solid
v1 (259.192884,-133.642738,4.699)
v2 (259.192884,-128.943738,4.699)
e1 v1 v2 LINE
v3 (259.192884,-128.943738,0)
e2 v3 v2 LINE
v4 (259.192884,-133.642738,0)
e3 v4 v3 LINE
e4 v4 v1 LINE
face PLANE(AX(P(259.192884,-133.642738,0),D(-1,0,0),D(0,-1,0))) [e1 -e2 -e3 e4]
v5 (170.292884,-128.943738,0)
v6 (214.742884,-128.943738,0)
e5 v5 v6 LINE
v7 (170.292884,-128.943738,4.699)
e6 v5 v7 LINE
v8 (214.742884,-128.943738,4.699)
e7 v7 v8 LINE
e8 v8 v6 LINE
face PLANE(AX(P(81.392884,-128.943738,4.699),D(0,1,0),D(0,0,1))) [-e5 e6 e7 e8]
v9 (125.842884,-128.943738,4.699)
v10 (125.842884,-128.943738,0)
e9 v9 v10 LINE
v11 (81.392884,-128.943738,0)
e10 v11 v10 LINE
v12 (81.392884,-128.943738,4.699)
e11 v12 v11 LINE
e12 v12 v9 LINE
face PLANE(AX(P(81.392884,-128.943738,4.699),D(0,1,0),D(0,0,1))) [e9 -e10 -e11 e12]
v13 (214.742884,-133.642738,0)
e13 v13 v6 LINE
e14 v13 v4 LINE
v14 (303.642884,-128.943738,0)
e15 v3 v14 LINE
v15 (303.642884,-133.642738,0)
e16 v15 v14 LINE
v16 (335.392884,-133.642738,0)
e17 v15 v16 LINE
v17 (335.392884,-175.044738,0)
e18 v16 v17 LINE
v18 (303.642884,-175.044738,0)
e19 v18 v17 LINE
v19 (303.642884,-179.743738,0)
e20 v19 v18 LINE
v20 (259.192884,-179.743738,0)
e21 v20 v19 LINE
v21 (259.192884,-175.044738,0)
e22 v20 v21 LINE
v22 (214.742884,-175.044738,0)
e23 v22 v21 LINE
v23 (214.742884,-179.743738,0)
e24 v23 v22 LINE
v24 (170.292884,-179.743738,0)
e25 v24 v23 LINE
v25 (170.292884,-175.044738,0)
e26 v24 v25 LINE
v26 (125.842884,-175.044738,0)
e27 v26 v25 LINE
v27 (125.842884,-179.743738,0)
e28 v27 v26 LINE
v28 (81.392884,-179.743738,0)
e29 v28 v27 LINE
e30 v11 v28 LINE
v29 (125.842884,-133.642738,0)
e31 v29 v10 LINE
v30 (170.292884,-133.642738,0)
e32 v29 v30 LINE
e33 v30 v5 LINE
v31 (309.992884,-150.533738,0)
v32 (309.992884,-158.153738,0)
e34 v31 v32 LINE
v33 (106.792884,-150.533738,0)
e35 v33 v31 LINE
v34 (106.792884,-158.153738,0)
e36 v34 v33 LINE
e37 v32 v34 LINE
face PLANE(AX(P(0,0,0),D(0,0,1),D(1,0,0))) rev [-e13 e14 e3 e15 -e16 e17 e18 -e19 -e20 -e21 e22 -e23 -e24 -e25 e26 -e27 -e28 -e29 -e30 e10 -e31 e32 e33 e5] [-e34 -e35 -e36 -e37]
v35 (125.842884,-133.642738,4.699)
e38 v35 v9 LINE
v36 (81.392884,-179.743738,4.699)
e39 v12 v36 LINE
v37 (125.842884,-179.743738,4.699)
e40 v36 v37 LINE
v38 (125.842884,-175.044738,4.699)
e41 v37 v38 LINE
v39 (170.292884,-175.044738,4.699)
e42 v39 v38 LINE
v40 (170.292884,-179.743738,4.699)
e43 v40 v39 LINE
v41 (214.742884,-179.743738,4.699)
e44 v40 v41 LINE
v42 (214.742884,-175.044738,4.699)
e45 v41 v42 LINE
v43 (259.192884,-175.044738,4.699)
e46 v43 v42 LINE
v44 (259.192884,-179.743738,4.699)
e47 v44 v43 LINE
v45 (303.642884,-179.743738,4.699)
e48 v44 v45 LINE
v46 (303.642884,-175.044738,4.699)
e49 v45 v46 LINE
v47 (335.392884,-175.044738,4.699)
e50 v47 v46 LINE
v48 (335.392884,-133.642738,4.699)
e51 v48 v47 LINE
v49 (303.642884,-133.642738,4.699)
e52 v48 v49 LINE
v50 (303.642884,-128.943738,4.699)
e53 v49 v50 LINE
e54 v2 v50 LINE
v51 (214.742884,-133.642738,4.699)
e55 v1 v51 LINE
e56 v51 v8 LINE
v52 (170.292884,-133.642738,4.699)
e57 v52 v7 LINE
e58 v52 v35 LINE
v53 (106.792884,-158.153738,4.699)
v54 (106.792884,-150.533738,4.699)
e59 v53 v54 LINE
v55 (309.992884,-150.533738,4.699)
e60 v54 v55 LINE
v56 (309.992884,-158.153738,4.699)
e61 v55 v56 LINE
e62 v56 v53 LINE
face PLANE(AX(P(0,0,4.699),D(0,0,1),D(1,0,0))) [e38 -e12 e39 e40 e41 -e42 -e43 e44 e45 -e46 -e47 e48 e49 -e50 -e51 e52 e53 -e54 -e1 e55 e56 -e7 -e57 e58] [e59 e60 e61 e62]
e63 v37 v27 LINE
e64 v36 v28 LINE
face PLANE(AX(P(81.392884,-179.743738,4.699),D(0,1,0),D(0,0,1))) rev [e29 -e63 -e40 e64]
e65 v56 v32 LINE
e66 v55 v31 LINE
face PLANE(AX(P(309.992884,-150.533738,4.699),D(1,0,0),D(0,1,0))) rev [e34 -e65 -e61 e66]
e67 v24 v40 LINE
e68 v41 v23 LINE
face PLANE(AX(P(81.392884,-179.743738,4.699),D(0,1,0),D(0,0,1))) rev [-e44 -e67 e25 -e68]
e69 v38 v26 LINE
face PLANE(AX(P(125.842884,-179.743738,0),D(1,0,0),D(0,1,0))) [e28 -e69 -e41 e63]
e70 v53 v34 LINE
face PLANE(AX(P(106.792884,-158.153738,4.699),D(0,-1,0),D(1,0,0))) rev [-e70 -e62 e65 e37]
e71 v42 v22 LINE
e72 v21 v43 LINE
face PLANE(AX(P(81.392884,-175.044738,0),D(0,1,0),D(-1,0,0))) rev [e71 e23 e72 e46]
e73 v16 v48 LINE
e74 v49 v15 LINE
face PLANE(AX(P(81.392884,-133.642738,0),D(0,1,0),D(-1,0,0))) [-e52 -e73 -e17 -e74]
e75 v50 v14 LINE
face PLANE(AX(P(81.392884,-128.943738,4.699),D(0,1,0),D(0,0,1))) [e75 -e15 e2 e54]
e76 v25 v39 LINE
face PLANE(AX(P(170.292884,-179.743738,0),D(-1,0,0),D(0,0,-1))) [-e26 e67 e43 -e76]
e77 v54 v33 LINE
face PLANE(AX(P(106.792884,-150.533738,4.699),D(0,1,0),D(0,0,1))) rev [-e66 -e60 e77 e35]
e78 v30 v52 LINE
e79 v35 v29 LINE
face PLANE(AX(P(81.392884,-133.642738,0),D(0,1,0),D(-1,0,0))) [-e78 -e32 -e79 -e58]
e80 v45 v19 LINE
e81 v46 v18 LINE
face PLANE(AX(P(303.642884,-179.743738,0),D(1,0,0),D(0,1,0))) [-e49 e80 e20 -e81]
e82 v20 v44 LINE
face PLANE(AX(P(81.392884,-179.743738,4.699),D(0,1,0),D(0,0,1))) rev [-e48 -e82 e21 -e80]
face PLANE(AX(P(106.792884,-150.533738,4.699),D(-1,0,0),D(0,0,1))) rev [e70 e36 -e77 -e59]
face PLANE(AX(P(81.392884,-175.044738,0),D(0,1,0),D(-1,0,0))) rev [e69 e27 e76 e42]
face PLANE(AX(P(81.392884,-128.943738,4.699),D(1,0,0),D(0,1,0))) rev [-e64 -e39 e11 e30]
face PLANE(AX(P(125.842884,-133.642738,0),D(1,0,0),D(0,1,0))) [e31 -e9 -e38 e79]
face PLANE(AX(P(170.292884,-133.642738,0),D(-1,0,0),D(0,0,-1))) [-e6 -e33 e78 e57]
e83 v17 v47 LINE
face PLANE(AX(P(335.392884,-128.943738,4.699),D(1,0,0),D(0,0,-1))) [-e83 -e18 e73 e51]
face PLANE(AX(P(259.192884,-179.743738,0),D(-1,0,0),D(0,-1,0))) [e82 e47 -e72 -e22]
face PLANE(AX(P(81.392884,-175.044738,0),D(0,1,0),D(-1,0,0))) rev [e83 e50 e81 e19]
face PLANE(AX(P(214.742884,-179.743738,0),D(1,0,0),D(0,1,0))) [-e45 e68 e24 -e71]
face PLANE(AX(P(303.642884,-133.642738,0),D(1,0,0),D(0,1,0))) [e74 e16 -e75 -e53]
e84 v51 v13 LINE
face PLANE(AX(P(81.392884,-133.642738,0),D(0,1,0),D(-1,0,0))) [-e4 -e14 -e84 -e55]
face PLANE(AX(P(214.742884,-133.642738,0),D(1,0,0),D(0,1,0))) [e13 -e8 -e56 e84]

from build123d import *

# Parameters (mm, degrees)
SKETCH1_W           = 254
SKETCH1_H           = 50.8
BOSS_EXTRUDE1_DEPTH = 4.699
SKETCH2_W           = 203.2
SKETCH2_H           = 7.62
CUT_EXTRUDE1_DEPTH  = 381.549968508
CAVITY1_START       = 125.842884167
CAVITY1_OUTLINE_W   = 4.699
CAVITY1_OUTLINE_H   = 4.699
CAVITY1_DEPTH       = 44.45
CAVITY1_START_2     = 214.742884167
CAVITY1_2_OUTLINE_W = 4.699
CAVITY1_2_OUTLINE_H = 4.699
CAVITY1_2_DEPTH     = 44.45
CAVITY1_START_3     = 303.642884167
CAVITY1_3_OUTLINE_W = 4.699
CAVITY1_3_OUTLINE_H = 4.699
CAVITY1_3_DEPTH     = 31.75


# Read off the part's stored shape, not the designer's step: Cavity1
with BuildPart() as part:
    # Sketch1 → Boss-Extrude1 (new body)
    with BuildSketch(Plane.XY):
        with Locations((208.392884167, -154.343737527)):
            Rectangle(SKETCH1_W, SKETCH1_H)
    extrude(amount=BOSS_EXTRUDE1_DEPTH)

    # Sketch2 → Cut-Extrude1 (cut, through all)
    with BuildSketch(Plane(origin=(0, 0, 0), x_dir=(-1, 0, 0), z_dir=(0, 0, -1))):
        with Locations((-208.392884167, -154.343737527)):
            Rectangle(SKETCH2_W, SKETCH2_H)
    extrude(amount=-CUT_EXTRUDE1_DEPTH, mode=Mode.SUBTRACT)

    # Cavity1 outline → Cavity1 (cut)
    with BuildSketch(Plane.YZ.offset(CAVITY1_START)):
        with Locations((-177.394237527, 2.3495)):
            Rectangle(CAVITY1_OUTLINE_W, CAVITY1_OUTLINE_H)
        with Locations((-131.293237527, 2.3495)):
            Rectangle(CAVITY1_OUTLINE_W, CAVITY1_OUTLINE_H)
    extrude(amount=CAVITY1_DEPTH, mode=Mode.SUBTRACT)

    # Cavity1 2 outline → Cavity1 2 (cut)
    with BuildSketch(Plane.YZ.offset(CAVITY1_START_2)):
        with Locations((-177.394237527, 2.3495)):
            Rectangle(CAVITY1_2_OUTLINE_W, CAVITY1_2_OUTLINE_H)
        with Locations((-131.293237527, 2.3495)):
            Rectangle(CAVITY1_2_OUTLINE_W, CAVITY1_2_OUTLINE_H)
    extrude(amount=CAVITY1_2_DEPTH, mode=Mode.SUBTRACT)

    # Cavity1 3 outline → Cavity1 3 (cut)
    with BuildSketch(Plane.YZ.offset(CAVITY1_START_3)):
        with Locations((-177.394237527, 2.3495)):
            Rectangle(CAVITY1_3_OUTLINE_W, CAVITY1_3_OUTLINE_H)
        with Locations((-131.293237527, 2.3495)):
            Rectangle(CAVITY1_3_OUTLINE_W, CAVITY1_3_OUTLINE_H)
    extrude(amount=CAVITY1_3_DEPTH, mode=Mode.SUBTRACT)


solid = part.part
